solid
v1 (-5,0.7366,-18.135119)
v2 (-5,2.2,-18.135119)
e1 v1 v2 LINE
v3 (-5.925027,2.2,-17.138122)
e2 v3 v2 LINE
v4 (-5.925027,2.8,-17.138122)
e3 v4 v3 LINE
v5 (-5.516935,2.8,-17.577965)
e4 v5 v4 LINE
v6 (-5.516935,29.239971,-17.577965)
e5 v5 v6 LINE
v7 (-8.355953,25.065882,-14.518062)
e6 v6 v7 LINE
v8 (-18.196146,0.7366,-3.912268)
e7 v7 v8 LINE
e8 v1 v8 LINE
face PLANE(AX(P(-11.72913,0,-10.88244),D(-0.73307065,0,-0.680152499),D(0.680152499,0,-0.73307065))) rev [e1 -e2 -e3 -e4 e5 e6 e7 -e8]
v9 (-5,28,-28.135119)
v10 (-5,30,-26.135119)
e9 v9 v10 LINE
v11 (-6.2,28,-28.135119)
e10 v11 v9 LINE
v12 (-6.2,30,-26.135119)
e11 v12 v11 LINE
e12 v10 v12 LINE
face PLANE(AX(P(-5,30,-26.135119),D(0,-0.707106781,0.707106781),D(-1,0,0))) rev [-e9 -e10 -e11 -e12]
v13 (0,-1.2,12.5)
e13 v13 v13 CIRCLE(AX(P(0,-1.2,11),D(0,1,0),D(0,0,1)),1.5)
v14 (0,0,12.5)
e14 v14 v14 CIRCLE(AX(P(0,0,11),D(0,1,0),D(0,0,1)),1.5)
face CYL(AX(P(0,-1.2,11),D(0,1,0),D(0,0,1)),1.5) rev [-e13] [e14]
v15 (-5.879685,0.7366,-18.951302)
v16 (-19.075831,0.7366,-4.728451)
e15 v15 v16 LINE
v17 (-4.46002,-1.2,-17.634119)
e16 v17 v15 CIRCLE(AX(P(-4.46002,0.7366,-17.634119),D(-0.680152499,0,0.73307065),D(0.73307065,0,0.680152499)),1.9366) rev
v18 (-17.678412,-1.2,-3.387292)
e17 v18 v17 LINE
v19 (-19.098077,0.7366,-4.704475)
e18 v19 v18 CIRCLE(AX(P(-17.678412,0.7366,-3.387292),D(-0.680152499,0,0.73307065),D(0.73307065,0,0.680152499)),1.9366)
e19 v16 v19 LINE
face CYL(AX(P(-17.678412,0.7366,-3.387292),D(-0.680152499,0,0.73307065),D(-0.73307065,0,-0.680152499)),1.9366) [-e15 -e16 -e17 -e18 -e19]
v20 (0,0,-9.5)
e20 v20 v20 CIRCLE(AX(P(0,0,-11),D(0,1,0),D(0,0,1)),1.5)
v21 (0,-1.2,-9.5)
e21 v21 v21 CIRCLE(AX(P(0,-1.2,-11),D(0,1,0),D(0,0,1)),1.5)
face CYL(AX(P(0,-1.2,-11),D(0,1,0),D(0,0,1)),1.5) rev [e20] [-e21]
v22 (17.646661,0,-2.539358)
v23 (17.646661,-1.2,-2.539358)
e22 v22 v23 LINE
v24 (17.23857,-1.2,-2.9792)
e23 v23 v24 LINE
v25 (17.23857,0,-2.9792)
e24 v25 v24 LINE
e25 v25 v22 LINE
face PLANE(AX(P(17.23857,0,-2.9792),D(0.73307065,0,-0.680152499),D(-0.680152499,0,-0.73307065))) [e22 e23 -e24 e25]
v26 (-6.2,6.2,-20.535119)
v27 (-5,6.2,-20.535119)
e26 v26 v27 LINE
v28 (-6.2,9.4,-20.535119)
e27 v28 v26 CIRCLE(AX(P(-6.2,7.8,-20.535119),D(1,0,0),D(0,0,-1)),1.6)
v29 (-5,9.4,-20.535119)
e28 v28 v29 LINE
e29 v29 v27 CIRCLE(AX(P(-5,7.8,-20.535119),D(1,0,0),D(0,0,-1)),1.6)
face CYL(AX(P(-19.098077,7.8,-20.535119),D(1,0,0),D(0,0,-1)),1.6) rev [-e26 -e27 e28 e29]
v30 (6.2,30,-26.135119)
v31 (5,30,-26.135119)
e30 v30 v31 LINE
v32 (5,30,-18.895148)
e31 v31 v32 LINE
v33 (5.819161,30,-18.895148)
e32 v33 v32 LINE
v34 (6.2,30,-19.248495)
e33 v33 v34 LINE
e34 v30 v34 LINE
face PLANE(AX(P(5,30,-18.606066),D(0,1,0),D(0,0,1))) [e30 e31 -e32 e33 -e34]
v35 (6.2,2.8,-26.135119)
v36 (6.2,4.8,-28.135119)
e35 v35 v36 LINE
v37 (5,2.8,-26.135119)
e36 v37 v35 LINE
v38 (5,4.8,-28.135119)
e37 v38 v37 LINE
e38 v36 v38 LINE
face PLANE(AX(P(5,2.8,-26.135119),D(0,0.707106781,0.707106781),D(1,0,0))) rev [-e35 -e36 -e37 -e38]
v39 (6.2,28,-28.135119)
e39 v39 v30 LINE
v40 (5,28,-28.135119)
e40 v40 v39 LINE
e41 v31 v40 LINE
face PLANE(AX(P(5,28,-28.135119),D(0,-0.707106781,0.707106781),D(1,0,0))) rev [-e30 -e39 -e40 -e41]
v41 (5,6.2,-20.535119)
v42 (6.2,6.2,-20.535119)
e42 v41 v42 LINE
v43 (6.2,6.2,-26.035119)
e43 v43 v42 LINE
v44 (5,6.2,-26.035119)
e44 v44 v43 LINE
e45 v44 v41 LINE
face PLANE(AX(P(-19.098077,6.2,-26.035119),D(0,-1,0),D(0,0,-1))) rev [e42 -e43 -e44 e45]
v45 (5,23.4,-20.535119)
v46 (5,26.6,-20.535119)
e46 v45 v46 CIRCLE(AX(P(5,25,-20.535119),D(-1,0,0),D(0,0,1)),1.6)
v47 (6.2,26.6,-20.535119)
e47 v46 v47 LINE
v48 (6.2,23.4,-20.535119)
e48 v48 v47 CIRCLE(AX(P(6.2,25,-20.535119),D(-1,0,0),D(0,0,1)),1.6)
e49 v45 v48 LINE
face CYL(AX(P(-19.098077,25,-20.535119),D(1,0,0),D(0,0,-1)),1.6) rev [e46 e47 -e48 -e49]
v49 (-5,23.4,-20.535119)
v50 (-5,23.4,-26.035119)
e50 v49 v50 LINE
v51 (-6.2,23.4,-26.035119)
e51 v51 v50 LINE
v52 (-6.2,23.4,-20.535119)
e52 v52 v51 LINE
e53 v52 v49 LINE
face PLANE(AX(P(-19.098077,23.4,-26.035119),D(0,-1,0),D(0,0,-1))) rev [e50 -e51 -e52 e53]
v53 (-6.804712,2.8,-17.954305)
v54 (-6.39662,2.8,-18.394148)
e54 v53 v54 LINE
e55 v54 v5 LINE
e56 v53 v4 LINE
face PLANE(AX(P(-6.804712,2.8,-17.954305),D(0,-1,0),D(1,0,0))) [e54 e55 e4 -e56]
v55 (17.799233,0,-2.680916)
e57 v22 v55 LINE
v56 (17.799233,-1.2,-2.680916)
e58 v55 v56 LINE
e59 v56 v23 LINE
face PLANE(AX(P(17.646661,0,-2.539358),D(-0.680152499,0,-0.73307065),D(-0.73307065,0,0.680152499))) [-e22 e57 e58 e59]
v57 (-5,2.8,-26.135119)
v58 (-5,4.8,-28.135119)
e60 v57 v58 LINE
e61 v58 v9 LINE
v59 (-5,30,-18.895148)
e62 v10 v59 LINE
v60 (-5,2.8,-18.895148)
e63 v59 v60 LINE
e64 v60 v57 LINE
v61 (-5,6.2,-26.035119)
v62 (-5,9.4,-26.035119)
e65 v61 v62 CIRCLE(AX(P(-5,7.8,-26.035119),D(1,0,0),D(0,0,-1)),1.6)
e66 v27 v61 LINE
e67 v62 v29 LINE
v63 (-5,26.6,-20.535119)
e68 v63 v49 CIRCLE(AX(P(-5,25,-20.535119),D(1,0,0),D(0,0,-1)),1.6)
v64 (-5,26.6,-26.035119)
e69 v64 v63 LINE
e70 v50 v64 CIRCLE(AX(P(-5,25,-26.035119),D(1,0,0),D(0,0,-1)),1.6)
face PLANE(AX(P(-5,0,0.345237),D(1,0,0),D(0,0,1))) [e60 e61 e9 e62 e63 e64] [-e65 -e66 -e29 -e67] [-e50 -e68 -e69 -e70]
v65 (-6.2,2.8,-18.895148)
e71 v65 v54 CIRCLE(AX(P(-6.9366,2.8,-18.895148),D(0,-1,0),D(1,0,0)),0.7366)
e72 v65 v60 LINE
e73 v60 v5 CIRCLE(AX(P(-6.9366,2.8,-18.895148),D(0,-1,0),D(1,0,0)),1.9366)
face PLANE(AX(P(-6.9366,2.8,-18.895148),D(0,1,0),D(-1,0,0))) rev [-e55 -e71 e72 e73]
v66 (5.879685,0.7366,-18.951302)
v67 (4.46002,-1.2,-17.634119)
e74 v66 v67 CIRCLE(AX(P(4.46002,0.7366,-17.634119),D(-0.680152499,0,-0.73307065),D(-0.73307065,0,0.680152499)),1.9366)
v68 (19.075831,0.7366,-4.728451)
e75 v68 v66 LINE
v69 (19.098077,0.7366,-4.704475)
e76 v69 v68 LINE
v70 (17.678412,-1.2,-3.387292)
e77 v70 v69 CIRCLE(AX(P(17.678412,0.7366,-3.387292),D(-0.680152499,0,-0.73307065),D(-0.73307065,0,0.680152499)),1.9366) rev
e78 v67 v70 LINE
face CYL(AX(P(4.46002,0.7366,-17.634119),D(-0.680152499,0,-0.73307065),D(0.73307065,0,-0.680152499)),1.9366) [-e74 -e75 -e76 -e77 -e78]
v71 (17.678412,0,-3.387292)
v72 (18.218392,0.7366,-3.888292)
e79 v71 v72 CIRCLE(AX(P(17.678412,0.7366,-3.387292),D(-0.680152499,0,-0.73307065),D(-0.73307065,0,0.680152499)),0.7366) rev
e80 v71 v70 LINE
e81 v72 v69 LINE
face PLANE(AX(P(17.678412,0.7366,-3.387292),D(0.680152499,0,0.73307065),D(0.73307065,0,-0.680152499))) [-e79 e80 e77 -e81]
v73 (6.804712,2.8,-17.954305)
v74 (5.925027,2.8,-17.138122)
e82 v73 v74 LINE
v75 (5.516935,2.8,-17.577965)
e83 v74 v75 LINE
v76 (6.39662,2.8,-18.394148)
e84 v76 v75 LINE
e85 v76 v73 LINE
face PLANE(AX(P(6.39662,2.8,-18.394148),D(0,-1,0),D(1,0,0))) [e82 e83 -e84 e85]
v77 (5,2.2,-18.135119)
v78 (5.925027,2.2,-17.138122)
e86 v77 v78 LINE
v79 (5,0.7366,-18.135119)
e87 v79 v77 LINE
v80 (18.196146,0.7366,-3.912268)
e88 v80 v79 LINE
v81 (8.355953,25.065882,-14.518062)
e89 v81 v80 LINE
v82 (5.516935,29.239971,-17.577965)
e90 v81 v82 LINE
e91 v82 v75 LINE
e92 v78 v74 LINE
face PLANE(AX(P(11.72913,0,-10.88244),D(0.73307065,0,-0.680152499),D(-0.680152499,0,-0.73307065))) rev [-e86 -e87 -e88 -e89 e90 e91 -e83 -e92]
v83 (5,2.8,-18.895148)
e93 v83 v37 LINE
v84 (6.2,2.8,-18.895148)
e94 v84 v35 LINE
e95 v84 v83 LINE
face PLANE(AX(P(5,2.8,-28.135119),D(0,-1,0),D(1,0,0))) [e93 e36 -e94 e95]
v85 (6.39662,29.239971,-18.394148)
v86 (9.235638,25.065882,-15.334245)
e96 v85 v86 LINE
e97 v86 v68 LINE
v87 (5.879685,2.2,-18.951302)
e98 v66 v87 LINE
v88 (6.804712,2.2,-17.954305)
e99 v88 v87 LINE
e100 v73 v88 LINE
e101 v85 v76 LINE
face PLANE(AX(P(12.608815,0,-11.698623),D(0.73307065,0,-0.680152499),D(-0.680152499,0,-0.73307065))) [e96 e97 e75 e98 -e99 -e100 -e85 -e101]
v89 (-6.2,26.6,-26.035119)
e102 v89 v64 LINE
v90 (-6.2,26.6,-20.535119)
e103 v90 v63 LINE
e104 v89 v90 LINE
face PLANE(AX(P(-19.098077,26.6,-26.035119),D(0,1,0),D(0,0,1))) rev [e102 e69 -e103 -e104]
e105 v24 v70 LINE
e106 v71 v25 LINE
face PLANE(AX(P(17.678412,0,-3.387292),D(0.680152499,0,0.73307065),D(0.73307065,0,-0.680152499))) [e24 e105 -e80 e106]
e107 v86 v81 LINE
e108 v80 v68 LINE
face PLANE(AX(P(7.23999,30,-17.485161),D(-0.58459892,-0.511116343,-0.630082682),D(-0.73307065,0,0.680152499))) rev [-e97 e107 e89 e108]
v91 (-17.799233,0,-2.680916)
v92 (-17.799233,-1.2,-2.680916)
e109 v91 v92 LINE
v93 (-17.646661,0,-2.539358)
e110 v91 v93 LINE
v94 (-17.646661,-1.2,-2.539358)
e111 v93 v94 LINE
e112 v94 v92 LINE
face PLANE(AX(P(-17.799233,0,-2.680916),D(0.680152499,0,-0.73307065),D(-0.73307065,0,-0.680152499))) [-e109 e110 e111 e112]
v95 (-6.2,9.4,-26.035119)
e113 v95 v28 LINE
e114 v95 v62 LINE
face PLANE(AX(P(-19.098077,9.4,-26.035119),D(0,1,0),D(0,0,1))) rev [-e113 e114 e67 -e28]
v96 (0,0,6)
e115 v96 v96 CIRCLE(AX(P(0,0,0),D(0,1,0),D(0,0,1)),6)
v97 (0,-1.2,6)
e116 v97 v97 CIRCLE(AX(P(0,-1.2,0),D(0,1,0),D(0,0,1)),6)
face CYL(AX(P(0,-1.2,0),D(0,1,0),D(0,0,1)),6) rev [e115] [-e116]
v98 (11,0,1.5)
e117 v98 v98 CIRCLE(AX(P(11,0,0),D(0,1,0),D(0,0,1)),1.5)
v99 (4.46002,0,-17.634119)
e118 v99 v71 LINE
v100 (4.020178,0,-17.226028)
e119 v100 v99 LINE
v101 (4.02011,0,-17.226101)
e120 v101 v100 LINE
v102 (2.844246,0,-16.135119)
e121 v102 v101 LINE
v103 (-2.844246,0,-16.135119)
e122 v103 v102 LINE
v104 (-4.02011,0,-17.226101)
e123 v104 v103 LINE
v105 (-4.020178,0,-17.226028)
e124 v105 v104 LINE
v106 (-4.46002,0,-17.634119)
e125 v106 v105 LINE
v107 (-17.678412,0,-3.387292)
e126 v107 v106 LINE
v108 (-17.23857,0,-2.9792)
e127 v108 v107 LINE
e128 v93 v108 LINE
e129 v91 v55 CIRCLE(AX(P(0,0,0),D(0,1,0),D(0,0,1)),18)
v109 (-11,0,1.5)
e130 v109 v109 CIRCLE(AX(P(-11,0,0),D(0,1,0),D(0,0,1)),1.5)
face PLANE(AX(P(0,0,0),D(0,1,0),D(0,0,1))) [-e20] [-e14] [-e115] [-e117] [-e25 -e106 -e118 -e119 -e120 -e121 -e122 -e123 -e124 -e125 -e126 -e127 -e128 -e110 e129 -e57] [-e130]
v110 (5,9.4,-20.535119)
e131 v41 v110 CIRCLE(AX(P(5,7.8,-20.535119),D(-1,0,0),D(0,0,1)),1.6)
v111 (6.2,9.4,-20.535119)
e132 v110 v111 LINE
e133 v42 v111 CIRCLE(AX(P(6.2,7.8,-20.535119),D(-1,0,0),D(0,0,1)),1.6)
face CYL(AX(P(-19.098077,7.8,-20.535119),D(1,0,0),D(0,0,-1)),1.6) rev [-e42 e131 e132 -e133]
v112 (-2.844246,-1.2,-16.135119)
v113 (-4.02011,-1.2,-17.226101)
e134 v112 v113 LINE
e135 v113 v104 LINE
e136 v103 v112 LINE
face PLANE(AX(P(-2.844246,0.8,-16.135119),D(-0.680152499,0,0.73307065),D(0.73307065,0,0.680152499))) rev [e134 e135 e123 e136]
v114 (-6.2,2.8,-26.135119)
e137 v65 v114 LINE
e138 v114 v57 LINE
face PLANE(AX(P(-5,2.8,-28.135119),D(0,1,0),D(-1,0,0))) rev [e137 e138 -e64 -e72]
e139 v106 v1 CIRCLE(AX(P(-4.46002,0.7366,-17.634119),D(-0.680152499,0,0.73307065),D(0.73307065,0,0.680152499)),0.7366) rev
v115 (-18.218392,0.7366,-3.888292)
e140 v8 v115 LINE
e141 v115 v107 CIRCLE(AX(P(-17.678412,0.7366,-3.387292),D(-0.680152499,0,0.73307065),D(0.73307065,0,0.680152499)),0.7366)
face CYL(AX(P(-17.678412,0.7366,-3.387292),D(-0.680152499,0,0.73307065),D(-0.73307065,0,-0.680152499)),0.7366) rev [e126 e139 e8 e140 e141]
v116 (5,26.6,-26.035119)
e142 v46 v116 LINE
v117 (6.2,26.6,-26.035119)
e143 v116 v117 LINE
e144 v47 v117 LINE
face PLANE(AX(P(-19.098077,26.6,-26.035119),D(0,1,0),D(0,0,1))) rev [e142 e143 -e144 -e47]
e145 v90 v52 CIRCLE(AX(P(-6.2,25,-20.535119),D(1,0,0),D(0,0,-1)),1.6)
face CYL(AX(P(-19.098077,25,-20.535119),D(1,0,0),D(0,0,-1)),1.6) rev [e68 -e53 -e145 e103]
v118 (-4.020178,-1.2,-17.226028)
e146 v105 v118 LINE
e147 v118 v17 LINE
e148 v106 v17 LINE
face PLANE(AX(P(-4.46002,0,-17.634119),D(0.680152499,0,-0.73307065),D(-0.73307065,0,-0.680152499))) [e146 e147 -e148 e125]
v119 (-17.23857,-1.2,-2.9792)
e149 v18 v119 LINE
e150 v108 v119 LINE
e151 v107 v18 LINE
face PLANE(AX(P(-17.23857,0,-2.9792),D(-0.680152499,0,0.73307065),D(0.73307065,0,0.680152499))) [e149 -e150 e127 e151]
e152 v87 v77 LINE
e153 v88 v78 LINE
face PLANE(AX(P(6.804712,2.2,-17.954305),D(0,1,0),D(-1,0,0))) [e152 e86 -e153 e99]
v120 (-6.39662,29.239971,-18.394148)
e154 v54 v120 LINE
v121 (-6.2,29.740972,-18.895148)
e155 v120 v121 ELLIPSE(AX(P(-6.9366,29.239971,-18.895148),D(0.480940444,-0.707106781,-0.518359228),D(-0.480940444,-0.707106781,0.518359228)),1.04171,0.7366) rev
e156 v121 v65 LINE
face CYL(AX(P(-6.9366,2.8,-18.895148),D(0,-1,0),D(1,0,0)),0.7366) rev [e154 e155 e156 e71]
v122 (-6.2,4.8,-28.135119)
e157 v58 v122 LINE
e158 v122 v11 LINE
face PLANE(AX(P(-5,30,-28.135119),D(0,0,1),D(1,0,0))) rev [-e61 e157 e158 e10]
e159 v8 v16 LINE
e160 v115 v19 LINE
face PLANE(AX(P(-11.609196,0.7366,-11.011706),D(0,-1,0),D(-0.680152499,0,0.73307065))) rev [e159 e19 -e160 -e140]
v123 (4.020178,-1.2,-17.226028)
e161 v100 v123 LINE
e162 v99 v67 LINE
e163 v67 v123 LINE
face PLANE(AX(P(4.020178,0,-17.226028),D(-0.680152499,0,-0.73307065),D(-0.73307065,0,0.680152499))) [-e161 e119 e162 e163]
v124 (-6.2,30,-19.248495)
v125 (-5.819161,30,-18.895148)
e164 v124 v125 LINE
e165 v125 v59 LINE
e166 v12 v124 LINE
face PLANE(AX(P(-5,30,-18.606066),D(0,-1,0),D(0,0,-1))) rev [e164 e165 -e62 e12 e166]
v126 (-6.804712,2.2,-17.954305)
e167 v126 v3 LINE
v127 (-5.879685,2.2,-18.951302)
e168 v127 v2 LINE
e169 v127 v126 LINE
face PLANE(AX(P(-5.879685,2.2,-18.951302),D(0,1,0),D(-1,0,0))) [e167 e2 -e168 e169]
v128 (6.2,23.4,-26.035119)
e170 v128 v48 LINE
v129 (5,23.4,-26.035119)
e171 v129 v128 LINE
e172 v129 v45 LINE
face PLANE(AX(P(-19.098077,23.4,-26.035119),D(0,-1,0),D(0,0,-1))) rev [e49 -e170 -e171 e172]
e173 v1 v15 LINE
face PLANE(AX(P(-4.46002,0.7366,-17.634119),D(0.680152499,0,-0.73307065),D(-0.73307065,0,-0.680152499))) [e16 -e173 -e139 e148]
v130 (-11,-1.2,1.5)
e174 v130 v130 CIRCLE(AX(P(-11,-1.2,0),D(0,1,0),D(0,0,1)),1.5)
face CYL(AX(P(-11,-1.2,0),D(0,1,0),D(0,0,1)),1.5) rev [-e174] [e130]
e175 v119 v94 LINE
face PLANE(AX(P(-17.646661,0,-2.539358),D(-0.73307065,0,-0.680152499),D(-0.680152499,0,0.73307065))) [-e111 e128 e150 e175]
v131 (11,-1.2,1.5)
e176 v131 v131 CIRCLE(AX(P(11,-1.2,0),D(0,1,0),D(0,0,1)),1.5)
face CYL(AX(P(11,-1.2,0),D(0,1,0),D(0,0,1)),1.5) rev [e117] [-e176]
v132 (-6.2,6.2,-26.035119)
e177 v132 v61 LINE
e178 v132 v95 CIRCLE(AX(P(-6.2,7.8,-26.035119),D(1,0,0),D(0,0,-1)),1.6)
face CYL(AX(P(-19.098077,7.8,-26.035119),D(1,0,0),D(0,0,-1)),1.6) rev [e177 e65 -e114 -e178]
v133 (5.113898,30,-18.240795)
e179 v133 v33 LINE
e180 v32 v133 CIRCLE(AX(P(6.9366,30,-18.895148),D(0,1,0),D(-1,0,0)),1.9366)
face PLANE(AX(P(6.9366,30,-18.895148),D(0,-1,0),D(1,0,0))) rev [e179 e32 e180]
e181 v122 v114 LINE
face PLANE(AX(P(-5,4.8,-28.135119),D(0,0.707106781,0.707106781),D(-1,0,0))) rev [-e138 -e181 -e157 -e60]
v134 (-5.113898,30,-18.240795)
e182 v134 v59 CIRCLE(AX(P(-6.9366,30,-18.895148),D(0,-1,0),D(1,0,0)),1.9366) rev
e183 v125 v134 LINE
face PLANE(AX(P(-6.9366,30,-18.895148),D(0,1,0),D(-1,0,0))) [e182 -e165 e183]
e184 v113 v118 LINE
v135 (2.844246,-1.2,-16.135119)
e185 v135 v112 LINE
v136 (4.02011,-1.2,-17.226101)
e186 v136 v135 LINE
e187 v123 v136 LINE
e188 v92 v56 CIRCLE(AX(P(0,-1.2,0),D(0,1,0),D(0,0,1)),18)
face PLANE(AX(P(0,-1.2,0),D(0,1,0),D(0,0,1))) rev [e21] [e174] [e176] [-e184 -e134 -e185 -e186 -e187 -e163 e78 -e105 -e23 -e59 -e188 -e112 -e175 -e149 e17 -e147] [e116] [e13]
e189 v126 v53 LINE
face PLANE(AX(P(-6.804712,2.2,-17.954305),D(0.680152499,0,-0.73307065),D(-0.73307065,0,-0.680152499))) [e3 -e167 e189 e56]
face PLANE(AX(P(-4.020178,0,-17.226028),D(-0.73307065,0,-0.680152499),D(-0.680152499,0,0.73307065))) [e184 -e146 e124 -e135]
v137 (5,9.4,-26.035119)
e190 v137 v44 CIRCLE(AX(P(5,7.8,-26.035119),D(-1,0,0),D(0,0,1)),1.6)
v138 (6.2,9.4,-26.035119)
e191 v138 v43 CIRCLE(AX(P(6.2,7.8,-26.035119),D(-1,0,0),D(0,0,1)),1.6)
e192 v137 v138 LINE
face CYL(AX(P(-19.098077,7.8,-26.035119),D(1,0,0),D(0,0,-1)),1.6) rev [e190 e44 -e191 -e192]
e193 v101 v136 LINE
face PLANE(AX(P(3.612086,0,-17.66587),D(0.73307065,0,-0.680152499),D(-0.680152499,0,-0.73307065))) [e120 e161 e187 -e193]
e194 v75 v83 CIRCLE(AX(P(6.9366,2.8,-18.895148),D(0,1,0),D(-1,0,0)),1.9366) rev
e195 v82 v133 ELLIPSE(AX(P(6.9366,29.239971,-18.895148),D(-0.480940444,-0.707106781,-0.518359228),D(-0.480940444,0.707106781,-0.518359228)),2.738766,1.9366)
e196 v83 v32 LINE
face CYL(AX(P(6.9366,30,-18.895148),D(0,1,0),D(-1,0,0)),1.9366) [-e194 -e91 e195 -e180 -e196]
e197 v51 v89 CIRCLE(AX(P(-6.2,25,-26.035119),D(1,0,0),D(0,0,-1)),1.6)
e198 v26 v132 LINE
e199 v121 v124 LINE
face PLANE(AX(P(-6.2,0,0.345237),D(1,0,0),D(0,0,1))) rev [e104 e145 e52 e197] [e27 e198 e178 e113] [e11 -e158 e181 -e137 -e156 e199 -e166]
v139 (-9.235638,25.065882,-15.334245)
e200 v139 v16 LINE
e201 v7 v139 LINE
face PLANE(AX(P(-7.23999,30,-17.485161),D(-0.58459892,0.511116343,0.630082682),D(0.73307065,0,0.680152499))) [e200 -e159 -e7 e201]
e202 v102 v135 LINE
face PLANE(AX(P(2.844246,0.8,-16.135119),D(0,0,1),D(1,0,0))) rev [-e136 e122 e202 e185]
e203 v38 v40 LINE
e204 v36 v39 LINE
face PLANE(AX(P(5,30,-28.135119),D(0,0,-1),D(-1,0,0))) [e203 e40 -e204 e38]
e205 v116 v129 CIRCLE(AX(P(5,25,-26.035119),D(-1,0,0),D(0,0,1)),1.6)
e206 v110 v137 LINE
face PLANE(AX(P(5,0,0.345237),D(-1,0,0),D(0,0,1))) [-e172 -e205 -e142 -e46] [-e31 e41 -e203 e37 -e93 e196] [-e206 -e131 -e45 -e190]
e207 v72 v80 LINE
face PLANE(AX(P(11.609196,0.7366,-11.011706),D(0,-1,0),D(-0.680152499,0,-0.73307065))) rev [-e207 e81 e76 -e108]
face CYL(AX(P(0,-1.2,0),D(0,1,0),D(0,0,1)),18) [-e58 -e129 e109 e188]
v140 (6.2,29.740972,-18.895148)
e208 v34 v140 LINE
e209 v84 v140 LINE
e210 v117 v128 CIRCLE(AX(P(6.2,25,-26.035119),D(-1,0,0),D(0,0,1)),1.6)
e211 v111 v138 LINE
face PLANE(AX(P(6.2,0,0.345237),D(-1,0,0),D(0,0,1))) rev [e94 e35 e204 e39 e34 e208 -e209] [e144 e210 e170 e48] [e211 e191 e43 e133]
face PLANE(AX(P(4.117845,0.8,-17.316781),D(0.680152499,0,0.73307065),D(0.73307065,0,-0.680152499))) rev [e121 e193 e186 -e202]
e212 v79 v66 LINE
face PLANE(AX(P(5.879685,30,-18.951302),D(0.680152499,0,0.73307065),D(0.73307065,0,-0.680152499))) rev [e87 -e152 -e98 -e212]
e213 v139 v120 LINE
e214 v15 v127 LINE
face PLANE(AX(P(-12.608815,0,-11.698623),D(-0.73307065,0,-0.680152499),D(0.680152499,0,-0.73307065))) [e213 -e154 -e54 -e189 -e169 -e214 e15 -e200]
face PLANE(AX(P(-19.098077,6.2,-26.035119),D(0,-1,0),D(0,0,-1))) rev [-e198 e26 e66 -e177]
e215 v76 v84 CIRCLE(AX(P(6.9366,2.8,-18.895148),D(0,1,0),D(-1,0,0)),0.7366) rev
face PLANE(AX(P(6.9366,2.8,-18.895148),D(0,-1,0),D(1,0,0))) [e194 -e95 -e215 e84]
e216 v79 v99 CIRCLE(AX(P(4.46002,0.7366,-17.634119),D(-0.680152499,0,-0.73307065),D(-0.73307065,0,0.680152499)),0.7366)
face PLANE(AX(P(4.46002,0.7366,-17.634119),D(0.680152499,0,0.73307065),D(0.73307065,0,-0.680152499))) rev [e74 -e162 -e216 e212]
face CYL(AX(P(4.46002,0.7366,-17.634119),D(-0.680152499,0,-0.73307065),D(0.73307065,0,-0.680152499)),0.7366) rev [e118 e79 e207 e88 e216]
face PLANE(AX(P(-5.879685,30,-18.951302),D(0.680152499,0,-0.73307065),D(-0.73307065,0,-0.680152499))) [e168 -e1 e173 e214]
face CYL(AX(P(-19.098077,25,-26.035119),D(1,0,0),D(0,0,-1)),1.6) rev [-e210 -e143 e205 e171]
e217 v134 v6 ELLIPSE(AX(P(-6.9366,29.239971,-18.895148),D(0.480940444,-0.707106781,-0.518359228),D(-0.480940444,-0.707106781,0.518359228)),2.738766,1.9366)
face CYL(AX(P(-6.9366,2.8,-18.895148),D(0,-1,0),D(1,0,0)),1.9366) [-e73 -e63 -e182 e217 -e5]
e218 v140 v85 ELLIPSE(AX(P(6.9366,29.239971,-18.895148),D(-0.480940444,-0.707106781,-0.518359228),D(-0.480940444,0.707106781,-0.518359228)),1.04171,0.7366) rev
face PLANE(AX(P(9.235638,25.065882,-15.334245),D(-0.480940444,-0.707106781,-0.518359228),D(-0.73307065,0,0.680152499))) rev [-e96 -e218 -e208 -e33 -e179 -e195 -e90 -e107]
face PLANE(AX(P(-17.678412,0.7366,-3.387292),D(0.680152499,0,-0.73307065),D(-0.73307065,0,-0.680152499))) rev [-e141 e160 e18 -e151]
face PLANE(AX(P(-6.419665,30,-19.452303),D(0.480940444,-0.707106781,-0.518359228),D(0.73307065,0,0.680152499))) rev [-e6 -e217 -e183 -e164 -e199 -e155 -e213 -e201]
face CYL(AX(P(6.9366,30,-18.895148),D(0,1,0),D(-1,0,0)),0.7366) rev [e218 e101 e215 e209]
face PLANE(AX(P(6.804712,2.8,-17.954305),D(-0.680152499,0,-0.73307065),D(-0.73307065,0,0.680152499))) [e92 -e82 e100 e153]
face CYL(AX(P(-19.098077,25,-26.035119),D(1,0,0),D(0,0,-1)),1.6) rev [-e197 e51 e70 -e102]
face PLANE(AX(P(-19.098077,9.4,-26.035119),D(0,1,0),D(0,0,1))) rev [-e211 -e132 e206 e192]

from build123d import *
from OCP.BRepFilletAPI import BRepFilletAPI_MakeChamfer

# Parameters (mm, degrees)
T_LE_DE_BASE_PLI_E1_DEPTH       = 1.2
ESQUISSE12_R                    = 1.5
ESQUISSE12_R_2                  = 6
ENL_V_MAT_EXTRU_1_DEPTH         = 26.579729358
T_LE_START                      = -10.493561241
T_LE_PLI_E_SUR_AR_TE1_OUTLINE_W = 1.3366
T_LE_PLI_E_SUR_AR_TE1_OUTLINE_H = 1.2
T_LE_PLI_E_SUR_AR_TE1_DEPTH     = 0.6
T_LE_START_2                    = 9.540892015
T_LE_PLI_E_SUR_AR_TE1_2_DEPTH   = 0.6
T_LE_START_3                    = -9.893561241
T_LE_PLI_E_SUR_AR_TE1_3_DEPTH   = 19.434453256
T_LE_PLI_E_SUR_AR_TE1_4_DEPTH   = 2
T_LE_PLI_E_SUR_AR_TE1_5_DEPTH   = 19.434453256
T_LE_START_4                    = 16
T_LE_PLI_E_SUR_AR_TE1_6_DEPTH   = 1.2
T_LE_START_5                    = 2.2
T_LE_PLI_E_SUR_AR_TE2_DEPTH     = 27.8
T_LE_PLI_E_SUR_AR_TE2_2_DEPTH   = 0.6
T_LE_START_6                    = 2.8
T_LE_PLI_E_SUR_AR_TE2_3_DEPTH   = 27.2
CHANFREIN1_SIZE                 = 2
CHANFREIN1_SIZE2                = 5.740607303
CHANFREIN1_OF_SYM_TRIE1_SIZE    = 2
CHANFREIN1_OF_SYM_TRIE1_SIZE2   = 5.740607303
ENL_V_MAT_EXTRU_2_DEPTH         = 46.34668098
ENL_V_MAT_EXTRU_2_DEPTH_BACK    = 46.34668098
ENL_V_MAT_EXTRU_7_DEPTH         = 2


with BuildPart() as part:
    # Tôle de base pliée1: sheet metal written as solids
    # Esquisse1 → Tôle de base pliée1 (new body)
    with BuildSketch(Plane(origin=(0, 0, 0), x_dir=(1, 0, 0), z_dir=(0, 1, 0))):
        with BuildLine():
            Line((-5, 18.135119355), (-17.337811592, 4.837384541))
            ThreePointArc((-17.337811592, 4.837384541), (0, -18), (17.337811592, 4.837384541))
            Line((17.337811592, 4.837384541), (5, 18.135119355))
            Line((5, 18.135119355), (-5, 18.135119355))
        make_face()
    extrude(amount=-T_LE_DE_BASE_PLI_E1_DEPTH)

    # Esquisse12 → Enlèv. mat.-Extru.1 (cut, through all)
    with BuildSketch(Plane(origin=(0, 0, 0), x_dir=(1, 0, 0), z_dir=(0, 1, 0))):
        with Locations(Location((11, 0, 0), (0, 0, 270))):
            Circle(ESQUISSE12_R)
        with Locations(Location((0, 11, 0), (0, 0, 270))):
            Circle(ESQUISSE12_R)
        with Locations(Location((-11, 0, 0), (0, 0, 270))):
            Circle(ESQUISSE12_R)
        with Locations(Location((0, -11, 0), (0, 0, 270))):
            Circle(ESQUISSE12_R)
        with Locations(Location((0, 0, 0), (0, 0, 270))):
            Circle(ESQUISSE12_R_2)
    extrude(amount=-ENL_V_MAT_EXTRU_1_DEPTH, mode=Mode.SUBTRACT)

    # Tôle pliée sur arête1: read off the stored shape, not the designer's step
    # Tôle pliée sur arête1 outline → Tôle pliée sur arête1 (cut)
    with BuildSketch(Plane(origin=(0, 0, 0), x_dir=(0.7330706501266544, 0, -0.6801524990198037), z_dir=(0.6801524990198037, 0, 0.7330706501266546)).offset(T_LE_START)):
        with Locations((15.3317, -0.6)):
            Rectangle(T_LE_PLI_E_SUR_AR_TE1_OUTLINE_W, T_LE_PLI_E_SUR_AR_TE1_OUTLINE_H)
    t_le_pli_e_sur_ar_te1 = extrude(amount=T_LE_PLI_E_SUR_AR_TE1_DEPTH, mode=Mode.SUBTRACT)

    # T_le pli_e sur ar_te1 2 outline → T_le pli_e sur ar_te1 2 (cut)
    with BuildSketch(Plane(origin=(0, 0, 0), x_dir=(0.7330706501266544, 0, -0.6801524990198037), z_dir=(0.6801524990198037, 0, 0.7330706501266546)).offset(T_LE_START_2)):
        with BuildLine():
            Line((14.6634, 0), (14.6634, -1.2))
            Line((14.6634, -1.2), (15.2634, -1.2))
            ThreePointArc((15.2634, -1.2), (15.638821762, -1.163262642), (16, -1.054444388))
            Line((16, -1.054444388), (16, 0))
            Line((16, 0), (14.6634, 0))
        make_face()
    t_le_pli_e_sur_ar_te1_2 = extrude(amount=T_LE_PLI_E_SUR_AR_TE1_2_DEPTH, mode=Mode.SUBTRACT)

    # T_le pli_e sur ar_te1 3 outline → T_le pli_e sur ar_te1 3 (cut)
    with BuildSketch(Plane(origin=(0, 0, 0), x_dir=(0.7330706501266544, 0, -0.6801524990198037), z_dir=(0.6801524990198037, 0, 0.7330706501266546)).offset(T_LE_START_3)):
        with BuildLine():
            ThreePointArc((16, -1.054444388), (15.638821762, -1.163262642), (15.2634, -1.2))
            Line((15.2634, -1.2), (16, -1.2))
            Line((16, -1.2), (16, -1.054444388))
        make_face()
    t_le_pli_e_sur_ar_te1_3 = extrude(amount=T_LE_PLI_E_SUR_AR_TE1_3_DEPTH, mode=Mode.SUBTRACT)

    # T_le pli_e sur ar_te1 4 outline → T_le pli_e sur ar_te1 4 (add)
    with BuildSketch(Plane(origin=(0, 0, 0), x_dir=(0.7330706501266544, 0, -0.6801524990198037), z_dir=(0.6801524990198037, 0, 0.7330706501266546)).offset(T_LE_START_3)):
        with BuildLine():
            ThreePointArc((16, 0.7366), (15.784254855, 0.215745145), (15.2634, 0))
            Line((15.2634, 0), (16, 0))
            Line((16, 0), (16, -1.054444388))
            ThreePointArc((16, -1.054444388), (16.872269031, -0.341342484), (17.2, 0.7366))
            Line((17.2, 0.7366), (17.2, 30))
            Line((17.2, 30), (16, 30))
            Line((16, 30), (16, 0.7366))
        make_face()
    t_le_pli_e_sur_ar_te1_4 = extrude(amount=T_LE_PLI_E_SUR_AR_TE1_4_DEPTH)

    # T_le pli_e sur ar_te1 5 outline → T_le pli_e sur ar_te1 5 (add)
    with BuildSketch(Plane(origin=(0, 0, 0), x_dir=(0.7330706501266544, 0, -0.6801524990198037), z_dir=(0.6801524990198037, 0, 0.7330706501266546)).offset(T_LE_START_3)):
        with BuildLine():
            Line((14.6634, 0), (14.6634, -1.2))
            Line((14.6634, -1.2), (15.2634, -1.2))
            ThreePointArc((15.2634, -1.2), (16.632782992, -0.632782992), (17.2, 0.7366))
            Line((17.2, 0.7366), (16, 0.7366))
            ThreePointArc((16, 0.7366), (15.784254855, 0.215745145), (15.2634, 0))
            Line((15.2634, 0), (14.6634, 0))
        make_face()
    t_le_pli_e_sur_ar_te1_5 = extrude(amount=T_LE_PLI_E_SUR_AR_TE1_5_DEPTH)

    # T_le pli_e sur ar_te1 6 outline → T_le pli_e sur ar_te1 6 (add)
    with BuildSketch(Plane(origin=(0, 0, 0), x_dir=(0.6801524990198036, 0, 0.7330706501266546), z_dir=(0.7330706501266546, 0, -0.6801524990198037)).offset(T_LE_START_4)):
        Polygon((-7.893561241, -30), (9.508185371, -0.7366), (-7.893561241, -0.7366), align=None)
    t_le_pli_e_sur_ar_te1_6 = extrude(amount=T_LE_PLI_E_SUR_AR_TE1_6_DEPTH)

    # Tôle pliée sur arête2: read off the stored shape, not the designer's step
    # Tôle pliée sur arête2 outline → Tôle pliée sur arête2 (cut)
    with BuildSketch(Plane(origin=(0, 0, 0), x_dir=(1, 0, 0), z_dir=(0, 1, 0)).offset(T_LE_START_5)):
        with BuildLine():
            Line((5, 18.135119355), (5.516935379, 17.577964666))
            ThreePointArc((5.516935379, 17.577964666), (5.281888127, 17.88899285), (5.113898069, 18.240795467))
            Line((5.113898069, 18.240795467), (5, 18.135119355))
        make_face()
    t_le_pli_e_sur_ar_te2 = extrude(amount=T_LE_PLI_E_SUR_AR_TE2_DEPTH, mode=Mode.SUBTRACT)

    # T_le pli_e sur ar_te2 2 outline → T_le pli_e sur ar_te2 2 (cut)
    with BuildSketch(Plane(origin=(0, 0, 0), x_dir=(1, 0, 0), z_dir=(0, 1, 0)).offset(T_LE_START_5)):
        with BuildLine():
            Line((5.925026878, 17.138122276), (6.804711659, 17.954305274))
            Line((6.804711659, 17.954305274), (5.87968478, 18.951302354))
            Line((5.87968478, 18.951302354), (5.113898069, 18.240795467))
            ThreePointArc((5.113898069, 18.240795467), (5.281888127, 17.88899285), (5.516935379, 17.577964666))
            Line((5.516935379, 17.577964666), (5.925026878, 17.138122276))
        make_face()
    t_le_pli_e_sur_ar_te2_2 = extrude(amount=T_LE_PLI_E_SUR_AR_TE2_2_DEPTH, mode=Mode.SUBTRACT)

    # T_le pli_e sur ar_te2 3 outline → T_le pli_e sur ar_te2 3 (add)
    with BuildSketch(Plane(origin=(0, 0, 0), x_dir=(1, 0, 0), z_dir=(0, 1, 0)).offset(T_LE_START_6)):
        with BuildLine():
            Line((5.87968478, 18.951302354), (6.396620159, 18.394147664))
            ThreePointArc((6.396620159, 18.394147664), (6.250914682, 18.626047262), (6.2, 18.895147995))
            Line((6.2, 18.895147995), (6.2, 28.135119355))
            Line((6.2, 28.135119355), (5, 28.135119355))
            Line((5, 28.135119355), (5, 18.895147995))
            ThreePointArc((5, 18.895147995), (5.028686989, 18.563052376), (5.113898069, 18.240795467))
            Line((5.113898069, 18.240795467), (5.87968478, 18.951302354))
        make_face()
    t_le_pli_e_sur_ar_te2_3 = extrude(amount=T_LE_PLI_E_SUR_AR_TE2_3_DEPTH)

    # Chanfrein1: one chamfer whose edges measure the first distance from different faces: ONE call of the kernel's chamfer builder (chamfer() names one face for all edges)
    chanfrein1_edges_1 = [part.edges().sort_by_distance(p)[0] for p in [
        (5.6, 2.8, -28.135119355),
        (5.6, 30, -28.135119355),
    ]]
    chanfrein1_edges_2 = [part.edges().sort_by_distance(p)[0] for p in [
        (6.800147388, 30, -17.077069554),
    ]]
    chanfrein1_side_2 = [part.faces().sort_by_distance(p)[0] for p in [
        (5.687529449, 30, -22.422147631),
    ]]
    chanfrein1 = BRepFilletAPI_MakeChamfer(part.part.solid().wrapped)
    for e in chanfrein1_edges_1:
        chanfrein1.Add(CHANFREIN1_SIZE, e.wrapped)
    for e in chanfrein1_edges_2:
        chanfrein1.Add(CHANFREIN1_SIZE, CHANFREIN1_SIZE2, e.wrapped, chanfrein1_side_2[0].wrapped)  # the first distance lies on this face
    add(Compound.cast(chanfrein1.Shape()), mode=Mode.REPLACE)

    # Symétrie1: Tôle pliée sur arête1, T_le pli_e sur ar_te1 2, T_le pli_e sur ar_te1 3, T_le pli_e sur ar_te1 4, T_le pli_e sur ar_te1 5, T_le pli_e sur ar_te1 6, Tôle pliée sur arête2, T_le pli_e sur ar_te2 2, T_le pli_e sur ar_te2 3 across plane
    add(t_le_pli_e_sur_ar_te1.mirror(Plane(origin=(0, 0, 0), x_dir=(0, 0, 1), z_dir=(1, 0, 0))), mode=Mode.SUBTRACT)
    add(t_le_pli_e_sur_ar_te1_2.mirror(Plane(origin=(0, 0, 0), x_dir=(0, 0, 1), z_dir=(1, 0, 0))), mode=Mode.SUBTRACT)
    add(t_le_pli_e_sur_ar_te1_3.mirror(Plane(origin=(0, 0, 0), x_dir=(0, 0, 1), z_dir=(1, 0, 0))), mode=Mode.SUBTRACT)
    add(t_le_pli_e_sur_ar_te1_4.mirror(Plane(origin=(0, 0, 0), x_dir=(0, 0, 1), z_dir=(1, 0, 0))))
    add(t_le_pli_e_sur_ar_te1_5.mirror(Plane(origin=(0, 0, 0), x_dir=(0, 0, 1), z_dir=(1, 0, 0))))
    add(t_le_pli_e_sur_ar_te1_6.mirror(Plane(origin=(0, 0, 0), x_dir=(0, 0, 1), z_dir=(1, 0, 0))))
    add(t_le_pli_e_sur_ar_te2.mirror(Plane(origin=(0, 0, 0), x_dir=(0, 0, 1), z_dir=(1, 0, 0))), mode=Mode.SUBTRACT)
    add(t_le_pli_e_sur_ar_te2_2.mirror(Plane(origin=(0, 0, 0), x_dir=(0, 0, 1), z_dir=(1, 0, 0))), mode=Mode.SUBTRACT)
    add(t_le_pli_e_sur_ar_te2_3.mirror(Plane(origin=(0, 0, 0), x_dir=(0, 0, 1), z_dir=(1, 0, 0))))

    # Chanfrein1 of Symétrie1: one chamfer whose edges measure the first distance from different faces: ONE call of the kernel's chamfer builder (chamfer() names one face for all edges)
    chanfrein1_of_sym_trie1_edges_1 = [part.edges().sort_by_distance(p)[0] for p in [
        (-5.6, 2.8, -28.135119355),
        (-5.6, 30, -28.135119355),
    ]]
    chanfrein1_of_sym_trie1_edges_2 = [part.edges().sort_by_distance(p)[0] for p in [
        (-6.800147388, 30, -17.077069554),
    ]]
    chanfrein1_of_sym_trie1_side_2 = [part.faces().sort_by_distance(p)[0] for p in [
        (-5.687529449, 30, -22.422147631),
    ]]
    chanfrein1_of_sym_trie1 = BRepFilletAPI_MakeChamfer(part.part.solid().wrapped)
    for e in chanfrein1_of_sym_trie1_edges_1:
        chanfrein1_of_sym_trie1.Add(CHANFREIN1_OF_SYM_TRIE1_SIZE, e.wrapped)
    for e in chanfrein1_of_sym_trie1_edges_2:
        chanfrein1_of_sym_trie1.Add(CHANFREIN1_OF_SYM_TRIE1_SIZE, CHANFREIN1_OF_SYM_TRIE1_SIZE2, e.wrapped, chanfrein1_of_sym_trie1_side_2[0].wrapped)  # the first distance lies on this face
    add(Compound.cast(chanfrein1_of_sym_trie1.Shape()), mode=Mode.REPLACE)

    # Esquisse13 → Enlèv. mat.-Extru.2 (cut, two sides: drawn at the far end of the back side and taken through both)
    with BuildSketch(Plane(origin=(0, 0, 0), x_dir=(0, 0, -1), z_dir=(1, 0, 0)).offset(-ENL_V_MAT_EXTRU_2_DEPTH_BACK)):
        with BuildLine():
            Line((26.035119355, 23.4), (20.535119355, 23.4))
            ThreePointArc((20.535119355, 23.4), (18.935119355, 25), (20.535119355, 26.6))
            Line((20.535119355, 26.6), (26.035119355, 26.6))
            ThreePointArc((26.035119355, 26.6), (27.635119355, 25), (26.035119355, 23.4))
        make_face()
        with BuildLine():
            Line((26.035119355, 6.2), (20.535119355, 6.2))
            ThreePointArc((20.535119355, 6.2), (18.935119355, 7.8), (20.535119355, 9.4))
            Line((20.535119355, 9.4), (26.035119355, 9.4))
            ThreePointArc((26.035119355, 9.4), (27.635119355, 7.8), (26.035119355, 6.2))
        make_face()
    extrude(amount=ENL_V_MAT_EXTRU_2_DEPTH + ENL_V_MAT_EXTRU_2_DEPTH_BACK, mode=Mode.SUBTRACT)

    # Esquisse15 → Enlèv. mat.-Extru.7 (cut)
    with BuildSketch(Plane.XZ.offset(1.2)):
        Polygon((4.117844894, -17.316780768), (2.84424625, -16.135119355), (-2.84424625, -16.135119355), (-4.117844894, -17.316780768), (-4.117844894, -18.135119355), (4.117844894, -18.135119355), align=None)
    extrude(amount=-ENL_V_MAT_EXTRU_7_DEPTH, mode=Mode.SUBTRACT)


solid = part.part
